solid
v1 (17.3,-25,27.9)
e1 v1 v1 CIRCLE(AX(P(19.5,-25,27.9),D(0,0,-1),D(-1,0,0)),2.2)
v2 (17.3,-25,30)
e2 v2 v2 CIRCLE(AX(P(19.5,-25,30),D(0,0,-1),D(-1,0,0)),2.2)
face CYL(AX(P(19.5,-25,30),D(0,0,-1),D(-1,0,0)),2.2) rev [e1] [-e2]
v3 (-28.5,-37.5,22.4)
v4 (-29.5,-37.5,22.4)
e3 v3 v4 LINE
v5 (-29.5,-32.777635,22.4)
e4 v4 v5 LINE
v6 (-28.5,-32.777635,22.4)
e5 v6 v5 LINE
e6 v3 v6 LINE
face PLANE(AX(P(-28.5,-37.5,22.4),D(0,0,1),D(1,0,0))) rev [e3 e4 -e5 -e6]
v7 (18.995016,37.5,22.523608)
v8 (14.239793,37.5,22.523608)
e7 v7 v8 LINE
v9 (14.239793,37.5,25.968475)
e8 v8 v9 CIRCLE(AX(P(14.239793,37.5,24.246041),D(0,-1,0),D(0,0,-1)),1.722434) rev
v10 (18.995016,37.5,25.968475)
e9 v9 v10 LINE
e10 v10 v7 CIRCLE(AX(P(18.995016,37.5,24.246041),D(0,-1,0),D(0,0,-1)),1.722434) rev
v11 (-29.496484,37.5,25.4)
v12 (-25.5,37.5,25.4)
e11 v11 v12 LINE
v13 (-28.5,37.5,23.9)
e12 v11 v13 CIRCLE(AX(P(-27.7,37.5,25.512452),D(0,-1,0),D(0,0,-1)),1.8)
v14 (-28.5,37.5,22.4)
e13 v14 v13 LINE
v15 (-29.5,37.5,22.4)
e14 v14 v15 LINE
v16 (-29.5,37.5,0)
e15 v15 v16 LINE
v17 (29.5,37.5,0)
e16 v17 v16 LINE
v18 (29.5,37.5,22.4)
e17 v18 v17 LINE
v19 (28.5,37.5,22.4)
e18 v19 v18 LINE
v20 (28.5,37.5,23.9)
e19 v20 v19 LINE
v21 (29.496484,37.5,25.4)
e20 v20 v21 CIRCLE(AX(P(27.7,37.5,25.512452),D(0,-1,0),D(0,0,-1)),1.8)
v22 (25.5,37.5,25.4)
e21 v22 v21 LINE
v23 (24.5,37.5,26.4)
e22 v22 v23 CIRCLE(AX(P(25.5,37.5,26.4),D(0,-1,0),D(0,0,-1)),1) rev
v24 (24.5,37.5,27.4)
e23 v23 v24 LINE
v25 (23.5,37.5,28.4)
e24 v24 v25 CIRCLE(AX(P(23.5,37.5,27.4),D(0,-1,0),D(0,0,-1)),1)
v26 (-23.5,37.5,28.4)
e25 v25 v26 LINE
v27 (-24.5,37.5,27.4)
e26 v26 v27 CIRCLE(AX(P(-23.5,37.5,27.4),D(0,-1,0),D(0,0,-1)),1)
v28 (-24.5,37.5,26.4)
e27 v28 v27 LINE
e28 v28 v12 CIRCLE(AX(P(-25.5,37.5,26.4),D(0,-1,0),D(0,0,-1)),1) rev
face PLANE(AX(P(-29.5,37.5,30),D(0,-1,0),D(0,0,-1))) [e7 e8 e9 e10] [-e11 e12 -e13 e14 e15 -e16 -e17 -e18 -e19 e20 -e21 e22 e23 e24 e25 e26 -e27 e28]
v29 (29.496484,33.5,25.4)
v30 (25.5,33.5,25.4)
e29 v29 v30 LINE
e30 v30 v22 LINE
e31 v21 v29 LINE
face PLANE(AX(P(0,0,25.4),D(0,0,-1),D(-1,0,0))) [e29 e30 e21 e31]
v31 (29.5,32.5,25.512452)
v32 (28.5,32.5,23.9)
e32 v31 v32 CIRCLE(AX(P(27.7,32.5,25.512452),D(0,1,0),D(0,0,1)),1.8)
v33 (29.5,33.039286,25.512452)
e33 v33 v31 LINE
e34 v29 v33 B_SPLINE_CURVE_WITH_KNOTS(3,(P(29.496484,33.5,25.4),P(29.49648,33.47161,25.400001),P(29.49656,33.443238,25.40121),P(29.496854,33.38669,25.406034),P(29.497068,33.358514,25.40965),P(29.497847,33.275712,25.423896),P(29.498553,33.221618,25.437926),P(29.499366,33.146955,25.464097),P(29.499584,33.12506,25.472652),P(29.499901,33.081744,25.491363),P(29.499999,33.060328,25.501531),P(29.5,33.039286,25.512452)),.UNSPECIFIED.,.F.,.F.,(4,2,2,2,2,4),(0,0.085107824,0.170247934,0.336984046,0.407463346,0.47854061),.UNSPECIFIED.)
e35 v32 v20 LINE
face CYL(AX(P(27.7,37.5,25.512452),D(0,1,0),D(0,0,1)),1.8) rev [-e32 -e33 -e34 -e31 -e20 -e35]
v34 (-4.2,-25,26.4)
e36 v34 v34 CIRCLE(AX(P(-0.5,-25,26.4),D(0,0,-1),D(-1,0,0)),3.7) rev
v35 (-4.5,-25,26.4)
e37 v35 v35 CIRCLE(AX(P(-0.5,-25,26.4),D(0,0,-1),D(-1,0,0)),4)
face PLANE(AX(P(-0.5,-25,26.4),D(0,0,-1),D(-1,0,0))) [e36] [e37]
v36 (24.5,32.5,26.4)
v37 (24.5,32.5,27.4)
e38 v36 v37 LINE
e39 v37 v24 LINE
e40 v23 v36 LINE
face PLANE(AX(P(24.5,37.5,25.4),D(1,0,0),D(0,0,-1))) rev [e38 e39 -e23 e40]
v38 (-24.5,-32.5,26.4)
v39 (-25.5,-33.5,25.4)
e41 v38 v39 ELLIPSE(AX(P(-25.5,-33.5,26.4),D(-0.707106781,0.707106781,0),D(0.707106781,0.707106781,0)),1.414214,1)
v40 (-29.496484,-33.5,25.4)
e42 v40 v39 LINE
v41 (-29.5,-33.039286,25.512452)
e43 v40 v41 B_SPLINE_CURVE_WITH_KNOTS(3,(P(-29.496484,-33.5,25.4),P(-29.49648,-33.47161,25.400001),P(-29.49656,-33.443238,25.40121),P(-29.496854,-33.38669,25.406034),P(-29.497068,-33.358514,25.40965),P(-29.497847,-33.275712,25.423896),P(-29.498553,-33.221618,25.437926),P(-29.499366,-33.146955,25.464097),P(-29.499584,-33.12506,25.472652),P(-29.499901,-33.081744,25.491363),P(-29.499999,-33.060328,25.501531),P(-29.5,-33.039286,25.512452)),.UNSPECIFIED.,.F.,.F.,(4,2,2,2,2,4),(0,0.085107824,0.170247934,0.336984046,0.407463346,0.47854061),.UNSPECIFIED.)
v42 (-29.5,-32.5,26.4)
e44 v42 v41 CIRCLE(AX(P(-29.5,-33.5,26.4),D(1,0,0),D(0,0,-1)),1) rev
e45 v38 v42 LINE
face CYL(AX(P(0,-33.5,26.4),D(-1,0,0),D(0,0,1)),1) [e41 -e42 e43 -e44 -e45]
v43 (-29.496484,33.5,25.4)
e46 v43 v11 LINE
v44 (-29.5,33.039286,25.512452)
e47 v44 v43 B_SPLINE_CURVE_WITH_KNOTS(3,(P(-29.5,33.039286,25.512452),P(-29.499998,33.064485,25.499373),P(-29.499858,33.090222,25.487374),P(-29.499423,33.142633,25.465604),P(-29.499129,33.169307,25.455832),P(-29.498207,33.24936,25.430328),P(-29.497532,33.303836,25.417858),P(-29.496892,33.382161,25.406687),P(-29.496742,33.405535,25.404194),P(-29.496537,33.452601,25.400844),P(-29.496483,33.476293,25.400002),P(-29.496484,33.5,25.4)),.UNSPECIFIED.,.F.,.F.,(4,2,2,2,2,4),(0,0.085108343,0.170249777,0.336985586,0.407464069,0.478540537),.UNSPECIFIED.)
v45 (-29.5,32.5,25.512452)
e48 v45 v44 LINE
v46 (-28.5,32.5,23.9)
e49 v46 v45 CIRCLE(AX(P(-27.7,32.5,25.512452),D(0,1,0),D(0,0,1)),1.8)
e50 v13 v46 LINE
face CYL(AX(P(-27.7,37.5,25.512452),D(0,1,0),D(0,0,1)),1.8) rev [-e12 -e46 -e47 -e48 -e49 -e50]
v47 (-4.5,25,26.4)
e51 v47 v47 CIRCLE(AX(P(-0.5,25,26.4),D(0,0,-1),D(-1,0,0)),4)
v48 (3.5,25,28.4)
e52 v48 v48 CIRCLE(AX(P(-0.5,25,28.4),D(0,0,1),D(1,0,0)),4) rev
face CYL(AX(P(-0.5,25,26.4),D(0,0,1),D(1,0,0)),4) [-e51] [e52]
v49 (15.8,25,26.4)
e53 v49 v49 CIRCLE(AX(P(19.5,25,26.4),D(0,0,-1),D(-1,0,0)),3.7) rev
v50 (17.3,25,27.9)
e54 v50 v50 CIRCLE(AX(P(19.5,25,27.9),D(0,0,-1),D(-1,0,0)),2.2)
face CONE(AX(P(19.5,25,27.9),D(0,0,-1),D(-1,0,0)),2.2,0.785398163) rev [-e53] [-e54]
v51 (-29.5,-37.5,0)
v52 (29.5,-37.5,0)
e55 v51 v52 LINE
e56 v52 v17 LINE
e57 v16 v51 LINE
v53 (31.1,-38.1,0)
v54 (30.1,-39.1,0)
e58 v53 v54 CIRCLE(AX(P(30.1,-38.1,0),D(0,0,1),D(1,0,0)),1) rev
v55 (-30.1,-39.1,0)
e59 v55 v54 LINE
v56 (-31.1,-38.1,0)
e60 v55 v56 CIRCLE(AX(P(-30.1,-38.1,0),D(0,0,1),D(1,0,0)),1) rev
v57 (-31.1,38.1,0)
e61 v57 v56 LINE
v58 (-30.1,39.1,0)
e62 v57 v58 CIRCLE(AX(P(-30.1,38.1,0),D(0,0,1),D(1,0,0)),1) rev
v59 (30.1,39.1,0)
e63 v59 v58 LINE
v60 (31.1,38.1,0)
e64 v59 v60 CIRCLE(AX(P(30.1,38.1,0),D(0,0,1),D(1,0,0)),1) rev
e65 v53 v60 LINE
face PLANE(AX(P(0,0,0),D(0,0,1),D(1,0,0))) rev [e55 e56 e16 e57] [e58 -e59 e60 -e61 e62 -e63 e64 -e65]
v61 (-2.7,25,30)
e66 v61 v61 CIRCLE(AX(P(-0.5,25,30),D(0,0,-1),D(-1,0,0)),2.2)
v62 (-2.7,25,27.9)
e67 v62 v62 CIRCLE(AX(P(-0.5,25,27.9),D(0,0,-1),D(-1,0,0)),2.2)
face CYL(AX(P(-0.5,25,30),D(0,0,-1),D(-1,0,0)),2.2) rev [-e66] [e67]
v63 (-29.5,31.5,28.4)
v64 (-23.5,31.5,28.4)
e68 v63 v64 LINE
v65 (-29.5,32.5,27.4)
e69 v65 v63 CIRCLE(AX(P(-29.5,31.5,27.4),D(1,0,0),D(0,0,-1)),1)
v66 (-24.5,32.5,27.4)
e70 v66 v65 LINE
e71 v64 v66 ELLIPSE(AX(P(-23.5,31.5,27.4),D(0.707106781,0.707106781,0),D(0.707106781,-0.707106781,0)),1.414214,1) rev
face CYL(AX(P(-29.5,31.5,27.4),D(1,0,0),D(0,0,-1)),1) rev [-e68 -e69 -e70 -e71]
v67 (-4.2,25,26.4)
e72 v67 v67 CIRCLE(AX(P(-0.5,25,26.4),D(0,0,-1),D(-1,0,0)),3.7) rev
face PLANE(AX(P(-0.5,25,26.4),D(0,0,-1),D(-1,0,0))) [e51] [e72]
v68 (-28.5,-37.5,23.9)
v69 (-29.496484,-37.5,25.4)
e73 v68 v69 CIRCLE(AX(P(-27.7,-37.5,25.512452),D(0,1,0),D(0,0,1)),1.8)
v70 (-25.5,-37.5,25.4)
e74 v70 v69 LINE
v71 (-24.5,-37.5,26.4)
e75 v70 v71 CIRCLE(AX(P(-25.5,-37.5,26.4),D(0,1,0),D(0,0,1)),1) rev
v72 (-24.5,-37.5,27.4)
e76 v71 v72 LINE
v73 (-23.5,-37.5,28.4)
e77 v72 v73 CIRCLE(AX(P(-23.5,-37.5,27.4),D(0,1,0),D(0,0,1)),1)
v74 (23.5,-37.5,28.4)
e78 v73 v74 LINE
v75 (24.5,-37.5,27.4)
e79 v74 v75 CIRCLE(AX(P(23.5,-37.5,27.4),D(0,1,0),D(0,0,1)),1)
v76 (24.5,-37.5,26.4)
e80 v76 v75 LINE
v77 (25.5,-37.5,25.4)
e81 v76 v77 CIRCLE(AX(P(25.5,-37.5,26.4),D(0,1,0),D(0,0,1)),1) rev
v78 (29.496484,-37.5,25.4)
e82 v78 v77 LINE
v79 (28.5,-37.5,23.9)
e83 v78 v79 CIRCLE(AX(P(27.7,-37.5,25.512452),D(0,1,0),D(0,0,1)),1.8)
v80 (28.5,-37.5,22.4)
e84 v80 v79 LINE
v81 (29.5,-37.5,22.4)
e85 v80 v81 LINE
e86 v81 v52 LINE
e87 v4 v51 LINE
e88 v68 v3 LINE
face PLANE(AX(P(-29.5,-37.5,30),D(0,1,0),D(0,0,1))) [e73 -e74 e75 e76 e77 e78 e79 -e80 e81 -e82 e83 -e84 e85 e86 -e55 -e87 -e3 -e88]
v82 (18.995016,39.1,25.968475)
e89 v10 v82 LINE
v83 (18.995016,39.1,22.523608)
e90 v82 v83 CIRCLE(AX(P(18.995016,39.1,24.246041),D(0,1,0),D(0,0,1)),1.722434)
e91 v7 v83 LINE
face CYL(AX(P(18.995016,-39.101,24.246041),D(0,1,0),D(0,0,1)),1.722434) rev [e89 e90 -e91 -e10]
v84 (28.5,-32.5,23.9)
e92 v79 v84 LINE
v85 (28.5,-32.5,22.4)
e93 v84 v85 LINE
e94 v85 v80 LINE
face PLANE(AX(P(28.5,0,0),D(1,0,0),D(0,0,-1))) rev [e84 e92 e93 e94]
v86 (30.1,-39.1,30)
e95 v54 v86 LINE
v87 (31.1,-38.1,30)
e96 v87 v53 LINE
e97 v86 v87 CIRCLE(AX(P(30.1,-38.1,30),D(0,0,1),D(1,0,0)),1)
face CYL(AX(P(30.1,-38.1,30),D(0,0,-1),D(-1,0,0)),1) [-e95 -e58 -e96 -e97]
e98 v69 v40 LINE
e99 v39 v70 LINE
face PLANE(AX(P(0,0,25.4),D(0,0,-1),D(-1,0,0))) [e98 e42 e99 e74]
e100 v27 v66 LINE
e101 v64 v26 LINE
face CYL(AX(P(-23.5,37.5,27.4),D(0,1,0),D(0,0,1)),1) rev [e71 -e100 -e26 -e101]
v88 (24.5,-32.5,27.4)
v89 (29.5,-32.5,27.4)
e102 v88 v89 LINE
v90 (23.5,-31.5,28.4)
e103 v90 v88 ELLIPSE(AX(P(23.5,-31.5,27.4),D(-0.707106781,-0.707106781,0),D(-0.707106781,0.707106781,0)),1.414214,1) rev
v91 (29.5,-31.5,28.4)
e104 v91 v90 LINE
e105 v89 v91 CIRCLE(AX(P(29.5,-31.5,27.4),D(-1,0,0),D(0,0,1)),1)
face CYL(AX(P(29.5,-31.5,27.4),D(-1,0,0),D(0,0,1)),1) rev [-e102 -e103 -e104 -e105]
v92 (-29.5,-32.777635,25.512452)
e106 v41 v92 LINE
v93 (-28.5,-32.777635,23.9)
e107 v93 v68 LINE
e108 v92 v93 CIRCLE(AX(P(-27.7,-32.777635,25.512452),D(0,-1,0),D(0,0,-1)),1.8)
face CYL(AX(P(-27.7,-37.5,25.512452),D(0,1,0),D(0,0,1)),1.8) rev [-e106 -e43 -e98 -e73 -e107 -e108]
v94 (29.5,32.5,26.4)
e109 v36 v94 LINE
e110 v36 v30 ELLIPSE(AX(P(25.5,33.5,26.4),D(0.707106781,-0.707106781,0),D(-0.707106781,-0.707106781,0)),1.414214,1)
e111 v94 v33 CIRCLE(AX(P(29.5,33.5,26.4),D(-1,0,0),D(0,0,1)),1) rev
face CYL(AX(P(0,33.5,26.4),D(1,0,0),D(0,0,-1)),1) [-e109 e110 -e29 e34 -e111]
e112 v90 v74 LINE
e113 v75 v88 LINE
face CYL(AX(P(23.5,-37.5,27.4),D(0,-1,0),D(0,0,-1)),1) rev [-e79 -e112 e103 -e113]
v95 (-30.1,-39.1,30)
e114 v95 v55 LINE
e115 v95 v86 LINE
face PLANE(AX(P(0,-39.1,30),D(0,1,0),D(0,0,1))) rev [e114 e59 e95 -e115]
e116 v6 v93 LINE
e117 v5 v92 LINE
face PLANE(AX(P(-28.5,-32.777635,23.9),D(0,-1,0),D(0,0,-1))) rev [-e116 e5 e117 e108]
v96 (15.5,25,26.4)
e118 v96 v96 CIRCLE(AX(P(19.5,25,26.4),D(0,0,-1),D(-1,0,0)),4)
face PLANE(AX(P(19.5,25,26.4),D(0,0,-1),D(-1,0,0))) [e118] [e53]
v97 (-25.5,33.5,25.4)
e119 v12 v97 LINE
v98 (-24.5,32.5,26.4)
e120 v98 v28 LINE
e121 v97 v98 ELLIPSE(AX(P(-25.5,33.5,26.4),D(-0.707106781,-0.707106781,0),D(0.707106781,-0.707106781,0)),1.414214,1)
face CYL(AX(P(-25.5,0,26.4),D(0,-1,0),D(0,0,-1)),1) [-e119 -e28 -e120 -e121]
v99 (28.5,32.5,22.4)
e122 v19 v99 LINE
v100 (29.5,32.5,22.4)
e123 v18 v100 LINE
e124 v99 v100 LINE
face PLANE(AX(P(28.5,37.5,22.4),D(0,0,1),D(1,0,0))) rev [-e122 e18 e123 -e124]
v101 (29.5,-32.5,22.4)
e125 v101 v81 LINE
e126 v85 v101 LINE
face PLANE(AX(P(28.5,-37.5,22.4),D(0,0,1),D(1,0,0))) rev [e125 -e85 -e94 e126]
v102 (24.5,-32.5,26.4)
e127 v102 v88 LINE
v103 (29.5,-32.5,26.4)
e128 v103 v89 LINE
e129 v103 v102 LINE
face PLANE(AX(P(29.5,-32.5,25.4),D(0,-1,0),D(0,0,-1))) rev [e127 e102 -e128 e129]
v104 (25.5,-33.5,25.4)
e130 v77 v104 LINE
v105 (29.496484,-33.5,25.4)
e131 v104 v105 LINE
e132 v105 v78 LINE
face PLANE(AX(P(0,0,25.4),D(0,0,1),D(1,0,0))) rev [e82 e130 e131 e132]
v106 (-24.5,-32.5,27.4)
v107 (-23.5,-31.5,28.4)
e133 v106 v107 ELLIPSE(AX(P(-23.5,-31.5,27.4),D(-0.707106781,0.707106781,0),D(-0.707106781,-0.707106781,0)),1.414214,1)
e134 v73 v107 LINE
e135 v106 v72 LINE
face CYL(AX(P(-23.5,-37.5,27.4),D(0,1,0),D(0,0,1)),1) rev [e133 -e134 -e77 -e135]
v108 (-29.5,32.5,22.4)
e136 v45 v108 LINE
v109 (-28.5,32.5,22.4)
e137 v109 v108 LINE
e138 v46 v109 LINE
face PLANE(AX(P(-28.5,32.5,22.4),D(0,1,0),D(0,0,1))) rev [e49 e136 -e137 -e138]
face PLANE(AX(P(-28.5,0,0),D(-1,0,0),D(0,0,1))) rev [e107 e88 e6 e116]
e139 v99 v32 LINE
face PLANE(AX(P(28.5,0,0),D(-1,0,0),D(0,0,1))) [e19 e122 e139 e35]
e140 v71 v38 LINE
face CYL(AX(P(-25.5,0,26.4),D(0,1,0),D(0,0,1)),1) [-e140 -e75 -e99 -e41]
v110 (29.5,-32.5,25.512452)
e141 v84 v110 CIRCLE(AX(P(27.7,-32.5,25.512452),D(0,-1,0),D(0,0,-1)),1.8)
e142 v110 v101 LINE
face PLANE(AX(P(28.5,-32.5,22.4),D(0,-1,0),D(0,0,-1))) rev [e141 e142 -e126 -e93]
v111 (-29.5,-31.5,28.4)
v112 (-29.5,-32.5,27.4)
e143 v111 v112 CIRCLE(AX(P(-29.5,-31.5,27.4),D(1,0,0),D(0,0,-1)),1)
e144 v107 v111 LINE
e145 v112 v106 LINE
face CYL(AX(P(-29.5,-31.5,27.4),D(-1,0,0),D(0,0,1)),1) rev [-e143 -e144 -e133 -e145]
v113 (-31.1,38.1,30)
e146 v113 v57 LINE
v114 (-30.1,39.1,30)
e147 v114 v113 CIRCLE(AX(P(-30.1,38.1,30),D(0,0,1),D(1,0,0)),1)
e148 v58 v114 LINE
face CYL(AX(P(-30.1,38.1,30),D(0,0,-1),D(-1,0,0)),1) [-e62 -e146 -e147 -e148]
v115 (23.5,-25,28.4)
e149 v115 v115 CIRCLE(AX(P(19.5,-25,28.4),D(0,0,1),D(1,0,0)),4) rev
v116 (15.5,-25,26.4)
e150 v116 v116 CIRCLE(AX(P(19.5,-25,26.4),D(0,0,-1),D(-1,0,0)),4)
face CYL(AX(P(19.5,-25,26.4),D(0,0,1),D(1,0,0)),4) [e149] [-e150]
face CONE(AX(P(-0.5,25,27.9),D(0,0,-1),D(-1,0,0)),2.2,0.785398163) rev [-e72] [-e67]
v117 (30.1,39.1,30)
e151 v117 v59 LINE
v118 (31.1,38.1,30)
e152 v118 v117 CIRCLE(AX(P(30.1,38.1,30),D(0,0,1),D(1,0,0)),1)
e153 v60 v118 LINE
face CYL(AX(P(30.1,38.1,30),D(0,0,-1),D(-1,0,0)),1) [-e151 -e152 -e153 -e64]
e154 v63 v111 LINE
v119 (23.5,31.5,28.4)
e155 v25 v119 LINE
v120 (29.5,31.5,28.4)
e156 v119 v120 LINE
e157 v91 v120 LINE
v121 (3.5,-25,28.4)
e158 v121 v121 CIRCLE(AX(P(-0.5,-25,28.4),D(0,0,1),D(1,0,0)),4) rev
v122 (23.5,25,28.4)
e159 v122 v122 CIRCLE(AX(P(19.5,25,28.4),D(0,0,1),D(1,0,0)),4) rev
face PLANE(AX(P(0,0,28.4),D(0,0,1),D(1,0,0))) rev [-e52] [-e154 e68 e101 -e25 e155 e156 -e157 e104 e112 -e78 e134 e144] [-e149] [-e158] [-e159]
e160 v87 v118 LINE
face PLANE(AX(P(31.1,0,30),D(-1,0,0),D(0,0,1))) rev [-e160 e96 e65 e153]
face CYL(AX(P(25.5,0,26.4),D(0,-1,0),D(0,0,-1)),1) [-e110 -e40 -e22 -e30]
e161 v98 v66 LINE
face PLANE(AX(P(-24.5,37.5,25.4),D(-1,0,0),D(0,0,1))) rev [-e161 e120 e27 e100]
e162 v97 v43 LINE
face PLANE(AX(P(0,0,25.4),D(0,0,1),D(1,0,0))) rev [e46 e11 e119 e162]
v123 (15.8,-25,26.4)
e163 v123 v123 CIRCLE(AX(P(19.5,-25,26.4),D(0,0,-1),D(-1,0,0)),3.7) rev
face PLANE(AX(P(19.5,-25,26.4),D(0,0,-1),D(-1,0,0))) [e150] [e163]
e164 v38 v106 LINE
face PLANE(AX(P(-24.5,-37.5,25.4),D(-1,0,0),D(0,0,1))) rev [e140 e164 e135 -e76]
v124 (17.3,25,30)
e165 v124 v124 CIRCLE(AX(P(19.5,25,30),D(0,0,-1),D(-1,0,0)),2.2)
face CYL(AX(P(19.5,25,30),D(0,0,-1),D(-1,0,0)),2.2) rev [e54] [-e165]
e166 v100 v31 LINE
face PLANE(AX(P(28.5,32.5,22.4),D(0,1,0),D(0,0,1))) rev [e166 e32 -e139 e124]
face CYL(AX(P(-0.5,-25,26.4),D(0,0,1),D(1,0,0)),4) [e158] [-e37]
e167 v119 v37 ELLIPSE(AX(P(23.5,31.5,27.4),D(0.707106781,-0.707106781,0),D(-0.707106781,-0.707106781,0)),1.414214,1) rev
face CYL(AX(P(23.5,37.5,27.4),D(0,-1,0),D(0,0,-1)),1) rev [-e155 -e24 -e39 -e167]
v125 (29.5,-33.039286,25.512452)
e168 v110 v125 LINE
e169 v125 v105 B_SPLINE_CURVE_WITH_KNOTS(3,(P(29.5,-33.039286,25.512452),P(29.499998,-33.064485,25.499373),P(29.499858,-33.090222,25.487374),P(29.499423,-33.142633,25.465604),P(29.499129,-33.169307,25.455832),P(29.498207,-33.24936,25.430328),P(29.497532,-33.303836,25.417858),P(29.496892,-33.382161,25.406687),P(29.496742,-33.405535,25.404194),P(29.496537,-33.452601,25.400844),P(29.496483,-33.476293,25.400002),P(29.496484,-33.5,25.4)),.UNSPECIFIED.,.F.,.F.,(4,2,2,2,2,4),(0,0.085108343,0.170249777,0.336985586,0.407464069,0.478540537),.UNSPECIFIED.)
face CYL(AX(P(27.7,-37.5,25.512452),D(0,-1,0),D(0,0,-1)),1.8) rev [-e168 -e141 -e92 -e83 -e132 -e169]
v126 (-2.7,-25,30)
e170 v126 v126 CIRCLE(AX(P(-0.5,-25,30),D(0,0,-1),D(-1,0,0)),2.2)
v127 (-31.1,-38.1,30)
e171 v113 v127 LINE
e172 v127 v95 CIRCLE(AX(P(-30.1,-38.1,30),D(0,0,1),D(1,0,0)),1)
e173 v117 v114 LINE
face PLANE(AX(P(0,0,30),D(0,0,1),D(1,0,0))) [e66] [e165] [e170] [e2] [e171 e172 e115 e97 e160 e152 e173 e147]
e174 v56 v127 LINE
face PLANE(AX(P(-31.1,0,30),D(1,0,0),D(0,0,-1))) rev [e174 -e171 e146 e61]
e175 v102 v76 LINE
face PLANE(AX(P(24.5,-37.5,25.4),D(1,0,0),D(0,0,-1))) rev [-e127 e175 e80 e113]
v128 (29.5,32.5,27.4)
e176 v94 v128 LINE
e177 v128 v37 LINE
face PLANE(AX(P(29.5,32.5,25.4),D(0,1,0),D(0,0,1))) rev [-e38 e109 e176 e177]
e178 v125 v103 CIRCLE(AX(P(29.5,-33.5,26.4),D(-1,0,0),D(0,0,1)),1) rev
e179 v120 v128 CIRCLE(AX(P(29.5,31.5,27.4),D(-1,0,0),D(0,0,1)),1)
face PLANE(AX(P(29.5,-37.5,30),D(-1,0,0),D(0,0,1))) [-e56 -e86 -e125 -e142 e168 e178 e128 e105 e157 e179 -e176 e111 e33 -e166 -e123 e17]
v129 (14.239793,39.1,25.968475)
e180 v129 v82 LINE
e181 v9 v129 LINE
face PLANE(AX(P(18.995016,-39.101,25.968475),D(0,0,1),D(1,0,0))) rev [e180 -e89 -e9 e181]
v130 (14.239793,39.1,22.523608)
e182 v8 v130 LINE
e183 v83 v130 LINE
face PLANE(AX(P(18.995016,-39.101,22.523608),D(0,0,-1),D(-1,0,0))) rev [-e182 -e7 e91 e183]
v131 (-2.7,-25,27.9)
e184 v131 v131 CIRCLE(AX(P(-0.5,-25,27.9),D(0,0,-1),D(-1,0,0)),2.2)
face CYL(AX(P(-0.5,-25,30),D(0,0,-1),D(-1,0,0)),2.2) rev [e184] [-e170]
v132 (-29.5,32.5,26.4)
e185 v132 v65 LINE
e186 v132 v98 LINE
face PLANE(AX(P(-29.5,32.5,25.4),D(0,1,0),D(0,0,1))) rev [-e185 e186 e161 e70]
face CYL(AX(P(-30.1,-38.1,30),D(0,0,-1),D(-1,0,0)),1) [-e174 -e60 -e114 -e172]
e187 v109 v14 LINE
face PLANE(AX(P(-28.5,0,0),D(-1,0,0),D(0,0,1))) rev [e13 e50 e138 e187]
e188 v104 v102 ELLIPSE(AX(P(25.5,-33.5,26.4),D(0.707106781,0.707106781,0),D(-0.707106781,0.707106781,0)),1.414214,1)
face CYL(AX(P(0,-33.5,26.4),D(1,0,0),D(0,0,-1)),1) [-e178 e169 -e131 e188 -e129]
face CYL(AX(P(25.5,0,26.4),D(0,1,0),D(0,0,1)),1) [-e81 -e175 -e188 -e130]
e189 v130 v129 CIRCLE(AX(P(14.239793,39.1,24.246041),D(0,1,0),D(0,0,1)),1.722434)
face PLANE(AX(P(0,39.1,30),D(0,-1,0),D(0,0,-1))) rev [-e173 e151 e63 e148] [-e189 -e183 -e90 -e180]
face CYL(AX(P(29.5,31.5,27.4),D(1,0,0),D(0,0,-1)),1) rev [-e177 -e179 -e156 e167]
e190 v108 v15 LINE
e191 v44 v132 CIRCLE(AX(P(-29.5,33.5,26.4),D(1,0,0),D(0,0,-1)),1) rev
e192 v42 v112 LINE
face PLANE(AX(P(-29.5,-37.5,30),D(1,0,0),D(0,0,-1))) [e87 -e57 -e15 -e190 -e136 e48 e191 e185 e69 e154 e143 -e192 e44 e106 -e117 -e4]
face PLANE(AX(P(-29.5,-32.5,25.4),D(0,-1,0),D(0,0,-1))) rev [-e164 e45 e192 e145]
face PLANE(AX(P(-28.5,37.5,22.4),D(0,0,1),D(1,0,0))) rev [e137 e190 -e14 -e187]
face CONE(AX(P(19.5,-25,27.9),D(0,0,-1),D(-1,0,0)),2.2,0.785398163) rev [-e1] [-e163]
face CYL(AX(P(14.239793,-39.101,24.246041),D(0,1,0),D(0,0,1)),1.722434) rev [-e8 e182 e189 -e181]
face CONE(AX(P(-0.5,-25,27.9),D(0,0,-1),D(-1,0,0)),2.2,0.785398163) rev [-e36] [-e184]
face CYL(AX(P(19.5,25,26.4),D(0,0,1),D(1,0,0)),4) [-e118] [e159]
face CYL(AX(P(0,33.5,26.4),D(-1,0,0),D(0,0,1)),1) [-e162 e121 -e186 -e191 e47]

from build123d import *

# Parameters (mm, degrees)
SKETCH_1_W          = 62.2
SKETCH_1_H          = 78.2
SKETCH_1_W_2        = 59
SKETCH_1_H_2        = 75
EXTRUDE_1_DEPTH     = 30
SKETCH_2_W          = 62.2
SKETCH_2_H          = 78.2
EXTRUDE_1_2_DEPTH   = 1.6
SKETCH_3_W          = 5
SKETCH_3_H          = 5
EXTRUDE_2_DEPTH     = 3
SKETCH_4_W          = 1.5
SKETCH_4_H          = 5
EXTRUDE_3_DEPTH     = 1
SKETCH_5_W          = 1.5
SKETCH_5_H          = 5
SKETCH_5_H_2        = 4.722364884
EXTRUDE_4_DEPTH     = 1
FILLET_1_R          = 1
FILLET_2_R          = 1.8
SKETCH_6_R          = 2.2
CUT_EXTRUDE_1_DEPTH = 58.468078096
EXTRUDE_START       = 2
SKETCH_7_R          = 4
SKETCH_7_R_2        = 2.2
EXTRUDE_5_DEPTH     = 2
CHAMFER_1_SIZE      = 1.5
FILLET_3_R          = 1
CUT_EXTRUDE_2_REACH = 91.345


with BuildPart() as part:
    # Эскиз1 → Extrude 1 (new body)
    with BuildSketch(Plane.XY):
        Rectangle(SKETCH_1_W, SKETCH_1_H)
        Rectangle(SKETCH_1_W_2, SKETCH_1_H_2, mode=Mode.SUBTRACT)
    extrude(amount=EXTRUDE_1_DEPTH)

    # Эскиз2 → Extrude 1 2 (add)
    with BuildSketch(Plane.XY.offset(30)):
        Rectangle(SKETCH_2_W, SKETCH_2_H)
    extrude(amount=-EXTRUDE_1_2_DEPTH)

    # Эскиз3 → Бобышка-Вытянуть2 (add)
    with BuildSketch(Plane(origin=(0, 0, 28.4), x_dir=(-1, 0, 0), z_dir=(0, 0, -1))):
        with Locations((-27, 35)):
            Rectangle(SKETCH_3_W, SKETCH_3_H)
        with Locations((27, 35)):
            Rectangle(SKETCH_3_W, SKETCH_3_H)
        with Locations((-27, -35)):
            Rectangle(SKETCH_3_W, SKETCH_3_H)
        with Locations((27, -35)):
            Rectangle(SKETCH_3_W, SKETCH_3_H)
    extrude(amount=EXTRUDE_2_DEPTH)

    # Эскиз4 → Бобышка-Вытянуть3 (add)
    with BuildSketch(Plane.ZY.offset(-29.5)):
        with Locations((23.15, 35)):
            Rectangle(SKETCH_4_W, SKETCH_4_H)
        with Locations((23.15, -35)):
            Rectangle(SKETCH_4_W, SKETCH_4_H)
    extrude(amount=EXTRUDE_3_DEPTH)

    # Эскиз5 → Бобышка-Вытянуть4 (add)
    with BuildSketch(Plane(origin=(-29.5, 0, 0), x_dir=(0, 0, -1), z_dir=(1, 0, 0))):
        with Locations((-23.15, 35)):
            Rectangle(SKETCH_5_W, SKETCH_5_H)
        with Locations((-23.15, -35.138817558)):
            Rectangle(SKETCH_5_W, SKETCH_5_H_2)
    extrude(amount=EXTRUDE_4_DEPTH)

    # Скругление1
    fillet_1_edges = [part.edges().sort_by_distance(p)[0] for p in [
        (27, 32.5, 28.4),
        (24.5, 35, 28.4),
        (27, 32.5, 25.4),
        (24.5, 35, 25.4),
        (-24.5, 35, 28.4),
        (-27, 32.5, 28.4),
        (-24.5, 35, 25.4),
        (-27, 32.5, 25.4),
        (24.5, -35, 28.4),
        (27, -32.5, 28.4),
        (24.5, -35, 25.4),
        (27, -32.5, 25.4),
        (-27, -32.5, 28.4),
        (-24.5, -35, 28.4),
        (-27, -32.5, 25.4),
        (-24.5, -35, 25.4),
    ]]
    fillet(fillet_1_edges, radius=FILLET_1_R)

    # Скругление2
    # the kernel refuses this fillet: 1.8 mm, written as the material it adds along each edge
    with BuildSketch(Plane(origin=(29.5, -41.531128874, 23.9), x_dir=(0, 0, 1), z_dir=(0, 1, 0))) as fillet_2_piece_1_section:
        with BuildLine():
            CenterArc((1.61245155, -1.8), FILLET_2_R, 90, 63.612200039)
            Line((0, -1), (0, 0))
            Line((0, 0), (1.61245155, 0))
        make_face()
    fillet_2_piece_1 = extrude(amount=9.031128874, mode=Mode.PRIVATE)
    fillet_2_piece_1 = split(fillet_2_piece_1, bisect_by=Plane(origin=(29.5, -39.1, 23.9), z_dir=(0, 1, 0)), keep=Keep.TOP, mode=Mode.PRIVATE)
    add(fillet_2_piece_1)
    with BuildSketch(Plane(origin=(-29.5, -32.777635116, 23.9), x_dir=(0, 0, 1), z_dir=(0, -1, 0))) as fillet_2_piece_2_section:
        with BuildLine():
            CenterArc((1.61245155, -1.8), FILLET_2_R, 90, 63.612200039)
            Line((0, -1), (0, 0))
            Line((0, 0), (1.61245155, 0))
        make_face()
    fillet_2_piece_2 = extrude(amount=8.753493758, mode=Mode.PRIVATE)
    fillet_2_piece_2 = split(fillet_2_piece_2, bisect_by=Plane(origin=(-29.5, -39.1, 23.9), z_dir=(0, 1, 0)), keep=Keep.TOP, mode=Mode.PRIVATE)
    add(fillet_2_piece_2)
    with BuildSketch(Plane(origin=(-29.5, 41.531128874, 23.9), x_dir=(0, 0, 1), z_dir=(0, -1, 0))) as fillet_2_piece_3_section:
        with BuildLine():
            CenterArc((1.61245155, -1.8), FILLET_2_R, 90, 63.612200039)
            Line((0, -1), (0, 0))
            Line((0, 0), (1.61245155, 0))
        make_face()
    fillet_2_piece_3 = extrude(amount=9.031128874, mode=Mode.PRIVATE)
    fillet_2_piece_3 = split(fillet_2_piece_3, bisect_by=Plane(origin=(-29.5, 39.1, 23.9), z_dir=(0, -1, 0)), keep=Keep.TOP, mode=Mode.PRIVATE)
    add(fillet_2_piece_3)
    with BuildSketch(Plane(origin=(29.5, 41.531128874, 23.9), x_dir=(0, 0, 1), z_dir=(0, -1, 0))) as fillet_2_piece_4_section:
        with BuildLine():
            CenterArc((1.61245155, 1.8), FILLET_2_R, 206.387799961, 63.612200039)
            Line((0, 1), (0, 0))
            Line((0, 0), (1.61245155, 0))
        make_face()
    fillet_2_piece_4 = extrude(amount=9.031128874, mode=Mode.PRIVATE)
    fillet_2_piece_4 = split(fillet_2_piece_4, bisect_by=Plane(origin=(29.5, 39.1, 23.9), z_dir=(0, -1, 0)), keep=Keep.TOP, mode=Mode.PRIVATE)
    add(fillet_2_piece_4)

    # Эскиз6 → Вырез-Вытянуть1 (cut, through all)
    with BuildSketch(Plane(origin=(0, 0, 28.4), x_dir=(-1, 0, 0), z_dir=(0, 0, -1))):
        with Locations((-19.5, 25)):
            Circle(SKETCH_6_R)
        with Locations((0.5, 25)):
            Circle(SKETCH_6_R)
        with Locations((0.5, -25)):
            Circle(SKETCH_6_R)
        with Locations((-19.5, -25)):
            Circle(SKETCH_6_R)
    extrude(amount=-CUT_EXTRUDE_1_DEPTH, mode=Mode.SUBTRACT)

    # Эскиз7 → Бобышка-Вытянуть5 (add)
    # profile 1 of 4: a face of its own
    with BuildSketch(Plane(origin=(0, 0, 28.4), x_dir=(-1, 0, 0), z_dir=(0, 0, -1)).offset(EXTRUDE_START)):
        with Locations(Location((-19.5, 25, 0), (0, 0, 180))):
            Circle(SKETCH_7_R)
        with Locations((-19.5, 25)):
            Circle(SKETCH_7_R_2, mode=Mode.SUBTRACT)
    # profile 2 of 4: a face of its own
    with BuildSketch(Plane(origin=(0, 0, 28.4), x_dir=(-1, 0, 0), z_dir=(0, 0, -1)).offset(EXTRUDE_START)):
        with Locations(Location((0.5, 25, 0), (0, 0, 180))):
            Circle(SKETCH_7_R)
        with Locations((0.5, 25)):
            Circle(SKETCH_7_R_2, mode=Mode.SUBTRACT)
    # profile 3 of 4: a face of its own
    with BuildSketch(Plane(origin=(0, 0, 28.4), x_dir=(-1, 0, 0), z_dir=(0, 0, -1)).offset(EXTRUDE_START)):
        with Locations(Location((-19.5, -25, 0), (0, 0, 180))):
            Circle(SKETCH_7_R)
        with Locations((-19.5, -25)):
            Circle(SKETCH_7_R_2, mode=Mode.SUBTRACT)
    # profile 4 of 4: a face of its own
    with BuildSketch(Plane(origin=(0, 0, 28.4), x_dir=(-1, 0, 0), z_dir=(0, 0, -1)).offset(EXTRUDE_START)):
        with Locations(Location((0.5, -25, 0), (0, 0, 180))):
            Circle(SKETCH_7_R)
        with Locations((0.5, -25)):
            Circle(SKETCH_7_R_2, mode=Mode.SUBTRACT)
    extrude(amount=-EXTRUDE_5_DEPTH)

    # Фаска1
    chamfer_1_edges = [part.edges().sort_by_distance(p)[0] for p in [
        (21.7, 25, 26.4),
        (1.7, 25, 26.4),
        (21.7, -25, 26.4),
        (1.7, -25, 26.4),
    ]]
    chamfer(chamfer_1_edges, length=CHAMFER_1_SIZE)

    # Скругление3
    fillet_3_edges = [part.edges().sort_by_distance(p)[0] for p in [
        (31.1, -39.1, 15),
        (-31.1, -39.1, 15),
        (-31.1, 39.1, 15),
        (31.1, 39.1, 15),
    ]]
    fillet(fillet_3_edges, radius=FILLET_3_R)

    # Эскиз8 → Вырез-Вытянуть2 (cut, up to next)
    with BuildSketch(Plane(origin=(0, 39.1, 0), x_dir=(1, 0, 0), z_dir=(0, 1, 0)), mode=Mode.PRIVATE) as cut_extrude_2_sk1:
        with BuildLine():
            Line((18.995015929, -25.968474999), (14.239793371, -25.968474999))
            ThreePointArc((14.239793371, -25.968474999), (12.517359829, -24.246041457), (14.239793371, -22.523607914))
            Line((14.239793371, -22.523607914), (18.995015929, -22.523607914))
            ThreePointArc((18.995015929, -22.523607914), (20.717449472, -24.246041457), (18.995015929, -25.968474999))
        make_face()
    cut_extrude_2_tool1 = extrude(cut_extrude_2_sk1.sketch, amount=-CUT_EXTRUDE_2_REACH, mode=Mode.PRIVATE) & part.part
    add(cut_extrude_2_tool1.solids().sort_by_distance((16.617405, 39.1, 24.246041))[0], mode=Mode.SUBTRACT)


solid = part.part
